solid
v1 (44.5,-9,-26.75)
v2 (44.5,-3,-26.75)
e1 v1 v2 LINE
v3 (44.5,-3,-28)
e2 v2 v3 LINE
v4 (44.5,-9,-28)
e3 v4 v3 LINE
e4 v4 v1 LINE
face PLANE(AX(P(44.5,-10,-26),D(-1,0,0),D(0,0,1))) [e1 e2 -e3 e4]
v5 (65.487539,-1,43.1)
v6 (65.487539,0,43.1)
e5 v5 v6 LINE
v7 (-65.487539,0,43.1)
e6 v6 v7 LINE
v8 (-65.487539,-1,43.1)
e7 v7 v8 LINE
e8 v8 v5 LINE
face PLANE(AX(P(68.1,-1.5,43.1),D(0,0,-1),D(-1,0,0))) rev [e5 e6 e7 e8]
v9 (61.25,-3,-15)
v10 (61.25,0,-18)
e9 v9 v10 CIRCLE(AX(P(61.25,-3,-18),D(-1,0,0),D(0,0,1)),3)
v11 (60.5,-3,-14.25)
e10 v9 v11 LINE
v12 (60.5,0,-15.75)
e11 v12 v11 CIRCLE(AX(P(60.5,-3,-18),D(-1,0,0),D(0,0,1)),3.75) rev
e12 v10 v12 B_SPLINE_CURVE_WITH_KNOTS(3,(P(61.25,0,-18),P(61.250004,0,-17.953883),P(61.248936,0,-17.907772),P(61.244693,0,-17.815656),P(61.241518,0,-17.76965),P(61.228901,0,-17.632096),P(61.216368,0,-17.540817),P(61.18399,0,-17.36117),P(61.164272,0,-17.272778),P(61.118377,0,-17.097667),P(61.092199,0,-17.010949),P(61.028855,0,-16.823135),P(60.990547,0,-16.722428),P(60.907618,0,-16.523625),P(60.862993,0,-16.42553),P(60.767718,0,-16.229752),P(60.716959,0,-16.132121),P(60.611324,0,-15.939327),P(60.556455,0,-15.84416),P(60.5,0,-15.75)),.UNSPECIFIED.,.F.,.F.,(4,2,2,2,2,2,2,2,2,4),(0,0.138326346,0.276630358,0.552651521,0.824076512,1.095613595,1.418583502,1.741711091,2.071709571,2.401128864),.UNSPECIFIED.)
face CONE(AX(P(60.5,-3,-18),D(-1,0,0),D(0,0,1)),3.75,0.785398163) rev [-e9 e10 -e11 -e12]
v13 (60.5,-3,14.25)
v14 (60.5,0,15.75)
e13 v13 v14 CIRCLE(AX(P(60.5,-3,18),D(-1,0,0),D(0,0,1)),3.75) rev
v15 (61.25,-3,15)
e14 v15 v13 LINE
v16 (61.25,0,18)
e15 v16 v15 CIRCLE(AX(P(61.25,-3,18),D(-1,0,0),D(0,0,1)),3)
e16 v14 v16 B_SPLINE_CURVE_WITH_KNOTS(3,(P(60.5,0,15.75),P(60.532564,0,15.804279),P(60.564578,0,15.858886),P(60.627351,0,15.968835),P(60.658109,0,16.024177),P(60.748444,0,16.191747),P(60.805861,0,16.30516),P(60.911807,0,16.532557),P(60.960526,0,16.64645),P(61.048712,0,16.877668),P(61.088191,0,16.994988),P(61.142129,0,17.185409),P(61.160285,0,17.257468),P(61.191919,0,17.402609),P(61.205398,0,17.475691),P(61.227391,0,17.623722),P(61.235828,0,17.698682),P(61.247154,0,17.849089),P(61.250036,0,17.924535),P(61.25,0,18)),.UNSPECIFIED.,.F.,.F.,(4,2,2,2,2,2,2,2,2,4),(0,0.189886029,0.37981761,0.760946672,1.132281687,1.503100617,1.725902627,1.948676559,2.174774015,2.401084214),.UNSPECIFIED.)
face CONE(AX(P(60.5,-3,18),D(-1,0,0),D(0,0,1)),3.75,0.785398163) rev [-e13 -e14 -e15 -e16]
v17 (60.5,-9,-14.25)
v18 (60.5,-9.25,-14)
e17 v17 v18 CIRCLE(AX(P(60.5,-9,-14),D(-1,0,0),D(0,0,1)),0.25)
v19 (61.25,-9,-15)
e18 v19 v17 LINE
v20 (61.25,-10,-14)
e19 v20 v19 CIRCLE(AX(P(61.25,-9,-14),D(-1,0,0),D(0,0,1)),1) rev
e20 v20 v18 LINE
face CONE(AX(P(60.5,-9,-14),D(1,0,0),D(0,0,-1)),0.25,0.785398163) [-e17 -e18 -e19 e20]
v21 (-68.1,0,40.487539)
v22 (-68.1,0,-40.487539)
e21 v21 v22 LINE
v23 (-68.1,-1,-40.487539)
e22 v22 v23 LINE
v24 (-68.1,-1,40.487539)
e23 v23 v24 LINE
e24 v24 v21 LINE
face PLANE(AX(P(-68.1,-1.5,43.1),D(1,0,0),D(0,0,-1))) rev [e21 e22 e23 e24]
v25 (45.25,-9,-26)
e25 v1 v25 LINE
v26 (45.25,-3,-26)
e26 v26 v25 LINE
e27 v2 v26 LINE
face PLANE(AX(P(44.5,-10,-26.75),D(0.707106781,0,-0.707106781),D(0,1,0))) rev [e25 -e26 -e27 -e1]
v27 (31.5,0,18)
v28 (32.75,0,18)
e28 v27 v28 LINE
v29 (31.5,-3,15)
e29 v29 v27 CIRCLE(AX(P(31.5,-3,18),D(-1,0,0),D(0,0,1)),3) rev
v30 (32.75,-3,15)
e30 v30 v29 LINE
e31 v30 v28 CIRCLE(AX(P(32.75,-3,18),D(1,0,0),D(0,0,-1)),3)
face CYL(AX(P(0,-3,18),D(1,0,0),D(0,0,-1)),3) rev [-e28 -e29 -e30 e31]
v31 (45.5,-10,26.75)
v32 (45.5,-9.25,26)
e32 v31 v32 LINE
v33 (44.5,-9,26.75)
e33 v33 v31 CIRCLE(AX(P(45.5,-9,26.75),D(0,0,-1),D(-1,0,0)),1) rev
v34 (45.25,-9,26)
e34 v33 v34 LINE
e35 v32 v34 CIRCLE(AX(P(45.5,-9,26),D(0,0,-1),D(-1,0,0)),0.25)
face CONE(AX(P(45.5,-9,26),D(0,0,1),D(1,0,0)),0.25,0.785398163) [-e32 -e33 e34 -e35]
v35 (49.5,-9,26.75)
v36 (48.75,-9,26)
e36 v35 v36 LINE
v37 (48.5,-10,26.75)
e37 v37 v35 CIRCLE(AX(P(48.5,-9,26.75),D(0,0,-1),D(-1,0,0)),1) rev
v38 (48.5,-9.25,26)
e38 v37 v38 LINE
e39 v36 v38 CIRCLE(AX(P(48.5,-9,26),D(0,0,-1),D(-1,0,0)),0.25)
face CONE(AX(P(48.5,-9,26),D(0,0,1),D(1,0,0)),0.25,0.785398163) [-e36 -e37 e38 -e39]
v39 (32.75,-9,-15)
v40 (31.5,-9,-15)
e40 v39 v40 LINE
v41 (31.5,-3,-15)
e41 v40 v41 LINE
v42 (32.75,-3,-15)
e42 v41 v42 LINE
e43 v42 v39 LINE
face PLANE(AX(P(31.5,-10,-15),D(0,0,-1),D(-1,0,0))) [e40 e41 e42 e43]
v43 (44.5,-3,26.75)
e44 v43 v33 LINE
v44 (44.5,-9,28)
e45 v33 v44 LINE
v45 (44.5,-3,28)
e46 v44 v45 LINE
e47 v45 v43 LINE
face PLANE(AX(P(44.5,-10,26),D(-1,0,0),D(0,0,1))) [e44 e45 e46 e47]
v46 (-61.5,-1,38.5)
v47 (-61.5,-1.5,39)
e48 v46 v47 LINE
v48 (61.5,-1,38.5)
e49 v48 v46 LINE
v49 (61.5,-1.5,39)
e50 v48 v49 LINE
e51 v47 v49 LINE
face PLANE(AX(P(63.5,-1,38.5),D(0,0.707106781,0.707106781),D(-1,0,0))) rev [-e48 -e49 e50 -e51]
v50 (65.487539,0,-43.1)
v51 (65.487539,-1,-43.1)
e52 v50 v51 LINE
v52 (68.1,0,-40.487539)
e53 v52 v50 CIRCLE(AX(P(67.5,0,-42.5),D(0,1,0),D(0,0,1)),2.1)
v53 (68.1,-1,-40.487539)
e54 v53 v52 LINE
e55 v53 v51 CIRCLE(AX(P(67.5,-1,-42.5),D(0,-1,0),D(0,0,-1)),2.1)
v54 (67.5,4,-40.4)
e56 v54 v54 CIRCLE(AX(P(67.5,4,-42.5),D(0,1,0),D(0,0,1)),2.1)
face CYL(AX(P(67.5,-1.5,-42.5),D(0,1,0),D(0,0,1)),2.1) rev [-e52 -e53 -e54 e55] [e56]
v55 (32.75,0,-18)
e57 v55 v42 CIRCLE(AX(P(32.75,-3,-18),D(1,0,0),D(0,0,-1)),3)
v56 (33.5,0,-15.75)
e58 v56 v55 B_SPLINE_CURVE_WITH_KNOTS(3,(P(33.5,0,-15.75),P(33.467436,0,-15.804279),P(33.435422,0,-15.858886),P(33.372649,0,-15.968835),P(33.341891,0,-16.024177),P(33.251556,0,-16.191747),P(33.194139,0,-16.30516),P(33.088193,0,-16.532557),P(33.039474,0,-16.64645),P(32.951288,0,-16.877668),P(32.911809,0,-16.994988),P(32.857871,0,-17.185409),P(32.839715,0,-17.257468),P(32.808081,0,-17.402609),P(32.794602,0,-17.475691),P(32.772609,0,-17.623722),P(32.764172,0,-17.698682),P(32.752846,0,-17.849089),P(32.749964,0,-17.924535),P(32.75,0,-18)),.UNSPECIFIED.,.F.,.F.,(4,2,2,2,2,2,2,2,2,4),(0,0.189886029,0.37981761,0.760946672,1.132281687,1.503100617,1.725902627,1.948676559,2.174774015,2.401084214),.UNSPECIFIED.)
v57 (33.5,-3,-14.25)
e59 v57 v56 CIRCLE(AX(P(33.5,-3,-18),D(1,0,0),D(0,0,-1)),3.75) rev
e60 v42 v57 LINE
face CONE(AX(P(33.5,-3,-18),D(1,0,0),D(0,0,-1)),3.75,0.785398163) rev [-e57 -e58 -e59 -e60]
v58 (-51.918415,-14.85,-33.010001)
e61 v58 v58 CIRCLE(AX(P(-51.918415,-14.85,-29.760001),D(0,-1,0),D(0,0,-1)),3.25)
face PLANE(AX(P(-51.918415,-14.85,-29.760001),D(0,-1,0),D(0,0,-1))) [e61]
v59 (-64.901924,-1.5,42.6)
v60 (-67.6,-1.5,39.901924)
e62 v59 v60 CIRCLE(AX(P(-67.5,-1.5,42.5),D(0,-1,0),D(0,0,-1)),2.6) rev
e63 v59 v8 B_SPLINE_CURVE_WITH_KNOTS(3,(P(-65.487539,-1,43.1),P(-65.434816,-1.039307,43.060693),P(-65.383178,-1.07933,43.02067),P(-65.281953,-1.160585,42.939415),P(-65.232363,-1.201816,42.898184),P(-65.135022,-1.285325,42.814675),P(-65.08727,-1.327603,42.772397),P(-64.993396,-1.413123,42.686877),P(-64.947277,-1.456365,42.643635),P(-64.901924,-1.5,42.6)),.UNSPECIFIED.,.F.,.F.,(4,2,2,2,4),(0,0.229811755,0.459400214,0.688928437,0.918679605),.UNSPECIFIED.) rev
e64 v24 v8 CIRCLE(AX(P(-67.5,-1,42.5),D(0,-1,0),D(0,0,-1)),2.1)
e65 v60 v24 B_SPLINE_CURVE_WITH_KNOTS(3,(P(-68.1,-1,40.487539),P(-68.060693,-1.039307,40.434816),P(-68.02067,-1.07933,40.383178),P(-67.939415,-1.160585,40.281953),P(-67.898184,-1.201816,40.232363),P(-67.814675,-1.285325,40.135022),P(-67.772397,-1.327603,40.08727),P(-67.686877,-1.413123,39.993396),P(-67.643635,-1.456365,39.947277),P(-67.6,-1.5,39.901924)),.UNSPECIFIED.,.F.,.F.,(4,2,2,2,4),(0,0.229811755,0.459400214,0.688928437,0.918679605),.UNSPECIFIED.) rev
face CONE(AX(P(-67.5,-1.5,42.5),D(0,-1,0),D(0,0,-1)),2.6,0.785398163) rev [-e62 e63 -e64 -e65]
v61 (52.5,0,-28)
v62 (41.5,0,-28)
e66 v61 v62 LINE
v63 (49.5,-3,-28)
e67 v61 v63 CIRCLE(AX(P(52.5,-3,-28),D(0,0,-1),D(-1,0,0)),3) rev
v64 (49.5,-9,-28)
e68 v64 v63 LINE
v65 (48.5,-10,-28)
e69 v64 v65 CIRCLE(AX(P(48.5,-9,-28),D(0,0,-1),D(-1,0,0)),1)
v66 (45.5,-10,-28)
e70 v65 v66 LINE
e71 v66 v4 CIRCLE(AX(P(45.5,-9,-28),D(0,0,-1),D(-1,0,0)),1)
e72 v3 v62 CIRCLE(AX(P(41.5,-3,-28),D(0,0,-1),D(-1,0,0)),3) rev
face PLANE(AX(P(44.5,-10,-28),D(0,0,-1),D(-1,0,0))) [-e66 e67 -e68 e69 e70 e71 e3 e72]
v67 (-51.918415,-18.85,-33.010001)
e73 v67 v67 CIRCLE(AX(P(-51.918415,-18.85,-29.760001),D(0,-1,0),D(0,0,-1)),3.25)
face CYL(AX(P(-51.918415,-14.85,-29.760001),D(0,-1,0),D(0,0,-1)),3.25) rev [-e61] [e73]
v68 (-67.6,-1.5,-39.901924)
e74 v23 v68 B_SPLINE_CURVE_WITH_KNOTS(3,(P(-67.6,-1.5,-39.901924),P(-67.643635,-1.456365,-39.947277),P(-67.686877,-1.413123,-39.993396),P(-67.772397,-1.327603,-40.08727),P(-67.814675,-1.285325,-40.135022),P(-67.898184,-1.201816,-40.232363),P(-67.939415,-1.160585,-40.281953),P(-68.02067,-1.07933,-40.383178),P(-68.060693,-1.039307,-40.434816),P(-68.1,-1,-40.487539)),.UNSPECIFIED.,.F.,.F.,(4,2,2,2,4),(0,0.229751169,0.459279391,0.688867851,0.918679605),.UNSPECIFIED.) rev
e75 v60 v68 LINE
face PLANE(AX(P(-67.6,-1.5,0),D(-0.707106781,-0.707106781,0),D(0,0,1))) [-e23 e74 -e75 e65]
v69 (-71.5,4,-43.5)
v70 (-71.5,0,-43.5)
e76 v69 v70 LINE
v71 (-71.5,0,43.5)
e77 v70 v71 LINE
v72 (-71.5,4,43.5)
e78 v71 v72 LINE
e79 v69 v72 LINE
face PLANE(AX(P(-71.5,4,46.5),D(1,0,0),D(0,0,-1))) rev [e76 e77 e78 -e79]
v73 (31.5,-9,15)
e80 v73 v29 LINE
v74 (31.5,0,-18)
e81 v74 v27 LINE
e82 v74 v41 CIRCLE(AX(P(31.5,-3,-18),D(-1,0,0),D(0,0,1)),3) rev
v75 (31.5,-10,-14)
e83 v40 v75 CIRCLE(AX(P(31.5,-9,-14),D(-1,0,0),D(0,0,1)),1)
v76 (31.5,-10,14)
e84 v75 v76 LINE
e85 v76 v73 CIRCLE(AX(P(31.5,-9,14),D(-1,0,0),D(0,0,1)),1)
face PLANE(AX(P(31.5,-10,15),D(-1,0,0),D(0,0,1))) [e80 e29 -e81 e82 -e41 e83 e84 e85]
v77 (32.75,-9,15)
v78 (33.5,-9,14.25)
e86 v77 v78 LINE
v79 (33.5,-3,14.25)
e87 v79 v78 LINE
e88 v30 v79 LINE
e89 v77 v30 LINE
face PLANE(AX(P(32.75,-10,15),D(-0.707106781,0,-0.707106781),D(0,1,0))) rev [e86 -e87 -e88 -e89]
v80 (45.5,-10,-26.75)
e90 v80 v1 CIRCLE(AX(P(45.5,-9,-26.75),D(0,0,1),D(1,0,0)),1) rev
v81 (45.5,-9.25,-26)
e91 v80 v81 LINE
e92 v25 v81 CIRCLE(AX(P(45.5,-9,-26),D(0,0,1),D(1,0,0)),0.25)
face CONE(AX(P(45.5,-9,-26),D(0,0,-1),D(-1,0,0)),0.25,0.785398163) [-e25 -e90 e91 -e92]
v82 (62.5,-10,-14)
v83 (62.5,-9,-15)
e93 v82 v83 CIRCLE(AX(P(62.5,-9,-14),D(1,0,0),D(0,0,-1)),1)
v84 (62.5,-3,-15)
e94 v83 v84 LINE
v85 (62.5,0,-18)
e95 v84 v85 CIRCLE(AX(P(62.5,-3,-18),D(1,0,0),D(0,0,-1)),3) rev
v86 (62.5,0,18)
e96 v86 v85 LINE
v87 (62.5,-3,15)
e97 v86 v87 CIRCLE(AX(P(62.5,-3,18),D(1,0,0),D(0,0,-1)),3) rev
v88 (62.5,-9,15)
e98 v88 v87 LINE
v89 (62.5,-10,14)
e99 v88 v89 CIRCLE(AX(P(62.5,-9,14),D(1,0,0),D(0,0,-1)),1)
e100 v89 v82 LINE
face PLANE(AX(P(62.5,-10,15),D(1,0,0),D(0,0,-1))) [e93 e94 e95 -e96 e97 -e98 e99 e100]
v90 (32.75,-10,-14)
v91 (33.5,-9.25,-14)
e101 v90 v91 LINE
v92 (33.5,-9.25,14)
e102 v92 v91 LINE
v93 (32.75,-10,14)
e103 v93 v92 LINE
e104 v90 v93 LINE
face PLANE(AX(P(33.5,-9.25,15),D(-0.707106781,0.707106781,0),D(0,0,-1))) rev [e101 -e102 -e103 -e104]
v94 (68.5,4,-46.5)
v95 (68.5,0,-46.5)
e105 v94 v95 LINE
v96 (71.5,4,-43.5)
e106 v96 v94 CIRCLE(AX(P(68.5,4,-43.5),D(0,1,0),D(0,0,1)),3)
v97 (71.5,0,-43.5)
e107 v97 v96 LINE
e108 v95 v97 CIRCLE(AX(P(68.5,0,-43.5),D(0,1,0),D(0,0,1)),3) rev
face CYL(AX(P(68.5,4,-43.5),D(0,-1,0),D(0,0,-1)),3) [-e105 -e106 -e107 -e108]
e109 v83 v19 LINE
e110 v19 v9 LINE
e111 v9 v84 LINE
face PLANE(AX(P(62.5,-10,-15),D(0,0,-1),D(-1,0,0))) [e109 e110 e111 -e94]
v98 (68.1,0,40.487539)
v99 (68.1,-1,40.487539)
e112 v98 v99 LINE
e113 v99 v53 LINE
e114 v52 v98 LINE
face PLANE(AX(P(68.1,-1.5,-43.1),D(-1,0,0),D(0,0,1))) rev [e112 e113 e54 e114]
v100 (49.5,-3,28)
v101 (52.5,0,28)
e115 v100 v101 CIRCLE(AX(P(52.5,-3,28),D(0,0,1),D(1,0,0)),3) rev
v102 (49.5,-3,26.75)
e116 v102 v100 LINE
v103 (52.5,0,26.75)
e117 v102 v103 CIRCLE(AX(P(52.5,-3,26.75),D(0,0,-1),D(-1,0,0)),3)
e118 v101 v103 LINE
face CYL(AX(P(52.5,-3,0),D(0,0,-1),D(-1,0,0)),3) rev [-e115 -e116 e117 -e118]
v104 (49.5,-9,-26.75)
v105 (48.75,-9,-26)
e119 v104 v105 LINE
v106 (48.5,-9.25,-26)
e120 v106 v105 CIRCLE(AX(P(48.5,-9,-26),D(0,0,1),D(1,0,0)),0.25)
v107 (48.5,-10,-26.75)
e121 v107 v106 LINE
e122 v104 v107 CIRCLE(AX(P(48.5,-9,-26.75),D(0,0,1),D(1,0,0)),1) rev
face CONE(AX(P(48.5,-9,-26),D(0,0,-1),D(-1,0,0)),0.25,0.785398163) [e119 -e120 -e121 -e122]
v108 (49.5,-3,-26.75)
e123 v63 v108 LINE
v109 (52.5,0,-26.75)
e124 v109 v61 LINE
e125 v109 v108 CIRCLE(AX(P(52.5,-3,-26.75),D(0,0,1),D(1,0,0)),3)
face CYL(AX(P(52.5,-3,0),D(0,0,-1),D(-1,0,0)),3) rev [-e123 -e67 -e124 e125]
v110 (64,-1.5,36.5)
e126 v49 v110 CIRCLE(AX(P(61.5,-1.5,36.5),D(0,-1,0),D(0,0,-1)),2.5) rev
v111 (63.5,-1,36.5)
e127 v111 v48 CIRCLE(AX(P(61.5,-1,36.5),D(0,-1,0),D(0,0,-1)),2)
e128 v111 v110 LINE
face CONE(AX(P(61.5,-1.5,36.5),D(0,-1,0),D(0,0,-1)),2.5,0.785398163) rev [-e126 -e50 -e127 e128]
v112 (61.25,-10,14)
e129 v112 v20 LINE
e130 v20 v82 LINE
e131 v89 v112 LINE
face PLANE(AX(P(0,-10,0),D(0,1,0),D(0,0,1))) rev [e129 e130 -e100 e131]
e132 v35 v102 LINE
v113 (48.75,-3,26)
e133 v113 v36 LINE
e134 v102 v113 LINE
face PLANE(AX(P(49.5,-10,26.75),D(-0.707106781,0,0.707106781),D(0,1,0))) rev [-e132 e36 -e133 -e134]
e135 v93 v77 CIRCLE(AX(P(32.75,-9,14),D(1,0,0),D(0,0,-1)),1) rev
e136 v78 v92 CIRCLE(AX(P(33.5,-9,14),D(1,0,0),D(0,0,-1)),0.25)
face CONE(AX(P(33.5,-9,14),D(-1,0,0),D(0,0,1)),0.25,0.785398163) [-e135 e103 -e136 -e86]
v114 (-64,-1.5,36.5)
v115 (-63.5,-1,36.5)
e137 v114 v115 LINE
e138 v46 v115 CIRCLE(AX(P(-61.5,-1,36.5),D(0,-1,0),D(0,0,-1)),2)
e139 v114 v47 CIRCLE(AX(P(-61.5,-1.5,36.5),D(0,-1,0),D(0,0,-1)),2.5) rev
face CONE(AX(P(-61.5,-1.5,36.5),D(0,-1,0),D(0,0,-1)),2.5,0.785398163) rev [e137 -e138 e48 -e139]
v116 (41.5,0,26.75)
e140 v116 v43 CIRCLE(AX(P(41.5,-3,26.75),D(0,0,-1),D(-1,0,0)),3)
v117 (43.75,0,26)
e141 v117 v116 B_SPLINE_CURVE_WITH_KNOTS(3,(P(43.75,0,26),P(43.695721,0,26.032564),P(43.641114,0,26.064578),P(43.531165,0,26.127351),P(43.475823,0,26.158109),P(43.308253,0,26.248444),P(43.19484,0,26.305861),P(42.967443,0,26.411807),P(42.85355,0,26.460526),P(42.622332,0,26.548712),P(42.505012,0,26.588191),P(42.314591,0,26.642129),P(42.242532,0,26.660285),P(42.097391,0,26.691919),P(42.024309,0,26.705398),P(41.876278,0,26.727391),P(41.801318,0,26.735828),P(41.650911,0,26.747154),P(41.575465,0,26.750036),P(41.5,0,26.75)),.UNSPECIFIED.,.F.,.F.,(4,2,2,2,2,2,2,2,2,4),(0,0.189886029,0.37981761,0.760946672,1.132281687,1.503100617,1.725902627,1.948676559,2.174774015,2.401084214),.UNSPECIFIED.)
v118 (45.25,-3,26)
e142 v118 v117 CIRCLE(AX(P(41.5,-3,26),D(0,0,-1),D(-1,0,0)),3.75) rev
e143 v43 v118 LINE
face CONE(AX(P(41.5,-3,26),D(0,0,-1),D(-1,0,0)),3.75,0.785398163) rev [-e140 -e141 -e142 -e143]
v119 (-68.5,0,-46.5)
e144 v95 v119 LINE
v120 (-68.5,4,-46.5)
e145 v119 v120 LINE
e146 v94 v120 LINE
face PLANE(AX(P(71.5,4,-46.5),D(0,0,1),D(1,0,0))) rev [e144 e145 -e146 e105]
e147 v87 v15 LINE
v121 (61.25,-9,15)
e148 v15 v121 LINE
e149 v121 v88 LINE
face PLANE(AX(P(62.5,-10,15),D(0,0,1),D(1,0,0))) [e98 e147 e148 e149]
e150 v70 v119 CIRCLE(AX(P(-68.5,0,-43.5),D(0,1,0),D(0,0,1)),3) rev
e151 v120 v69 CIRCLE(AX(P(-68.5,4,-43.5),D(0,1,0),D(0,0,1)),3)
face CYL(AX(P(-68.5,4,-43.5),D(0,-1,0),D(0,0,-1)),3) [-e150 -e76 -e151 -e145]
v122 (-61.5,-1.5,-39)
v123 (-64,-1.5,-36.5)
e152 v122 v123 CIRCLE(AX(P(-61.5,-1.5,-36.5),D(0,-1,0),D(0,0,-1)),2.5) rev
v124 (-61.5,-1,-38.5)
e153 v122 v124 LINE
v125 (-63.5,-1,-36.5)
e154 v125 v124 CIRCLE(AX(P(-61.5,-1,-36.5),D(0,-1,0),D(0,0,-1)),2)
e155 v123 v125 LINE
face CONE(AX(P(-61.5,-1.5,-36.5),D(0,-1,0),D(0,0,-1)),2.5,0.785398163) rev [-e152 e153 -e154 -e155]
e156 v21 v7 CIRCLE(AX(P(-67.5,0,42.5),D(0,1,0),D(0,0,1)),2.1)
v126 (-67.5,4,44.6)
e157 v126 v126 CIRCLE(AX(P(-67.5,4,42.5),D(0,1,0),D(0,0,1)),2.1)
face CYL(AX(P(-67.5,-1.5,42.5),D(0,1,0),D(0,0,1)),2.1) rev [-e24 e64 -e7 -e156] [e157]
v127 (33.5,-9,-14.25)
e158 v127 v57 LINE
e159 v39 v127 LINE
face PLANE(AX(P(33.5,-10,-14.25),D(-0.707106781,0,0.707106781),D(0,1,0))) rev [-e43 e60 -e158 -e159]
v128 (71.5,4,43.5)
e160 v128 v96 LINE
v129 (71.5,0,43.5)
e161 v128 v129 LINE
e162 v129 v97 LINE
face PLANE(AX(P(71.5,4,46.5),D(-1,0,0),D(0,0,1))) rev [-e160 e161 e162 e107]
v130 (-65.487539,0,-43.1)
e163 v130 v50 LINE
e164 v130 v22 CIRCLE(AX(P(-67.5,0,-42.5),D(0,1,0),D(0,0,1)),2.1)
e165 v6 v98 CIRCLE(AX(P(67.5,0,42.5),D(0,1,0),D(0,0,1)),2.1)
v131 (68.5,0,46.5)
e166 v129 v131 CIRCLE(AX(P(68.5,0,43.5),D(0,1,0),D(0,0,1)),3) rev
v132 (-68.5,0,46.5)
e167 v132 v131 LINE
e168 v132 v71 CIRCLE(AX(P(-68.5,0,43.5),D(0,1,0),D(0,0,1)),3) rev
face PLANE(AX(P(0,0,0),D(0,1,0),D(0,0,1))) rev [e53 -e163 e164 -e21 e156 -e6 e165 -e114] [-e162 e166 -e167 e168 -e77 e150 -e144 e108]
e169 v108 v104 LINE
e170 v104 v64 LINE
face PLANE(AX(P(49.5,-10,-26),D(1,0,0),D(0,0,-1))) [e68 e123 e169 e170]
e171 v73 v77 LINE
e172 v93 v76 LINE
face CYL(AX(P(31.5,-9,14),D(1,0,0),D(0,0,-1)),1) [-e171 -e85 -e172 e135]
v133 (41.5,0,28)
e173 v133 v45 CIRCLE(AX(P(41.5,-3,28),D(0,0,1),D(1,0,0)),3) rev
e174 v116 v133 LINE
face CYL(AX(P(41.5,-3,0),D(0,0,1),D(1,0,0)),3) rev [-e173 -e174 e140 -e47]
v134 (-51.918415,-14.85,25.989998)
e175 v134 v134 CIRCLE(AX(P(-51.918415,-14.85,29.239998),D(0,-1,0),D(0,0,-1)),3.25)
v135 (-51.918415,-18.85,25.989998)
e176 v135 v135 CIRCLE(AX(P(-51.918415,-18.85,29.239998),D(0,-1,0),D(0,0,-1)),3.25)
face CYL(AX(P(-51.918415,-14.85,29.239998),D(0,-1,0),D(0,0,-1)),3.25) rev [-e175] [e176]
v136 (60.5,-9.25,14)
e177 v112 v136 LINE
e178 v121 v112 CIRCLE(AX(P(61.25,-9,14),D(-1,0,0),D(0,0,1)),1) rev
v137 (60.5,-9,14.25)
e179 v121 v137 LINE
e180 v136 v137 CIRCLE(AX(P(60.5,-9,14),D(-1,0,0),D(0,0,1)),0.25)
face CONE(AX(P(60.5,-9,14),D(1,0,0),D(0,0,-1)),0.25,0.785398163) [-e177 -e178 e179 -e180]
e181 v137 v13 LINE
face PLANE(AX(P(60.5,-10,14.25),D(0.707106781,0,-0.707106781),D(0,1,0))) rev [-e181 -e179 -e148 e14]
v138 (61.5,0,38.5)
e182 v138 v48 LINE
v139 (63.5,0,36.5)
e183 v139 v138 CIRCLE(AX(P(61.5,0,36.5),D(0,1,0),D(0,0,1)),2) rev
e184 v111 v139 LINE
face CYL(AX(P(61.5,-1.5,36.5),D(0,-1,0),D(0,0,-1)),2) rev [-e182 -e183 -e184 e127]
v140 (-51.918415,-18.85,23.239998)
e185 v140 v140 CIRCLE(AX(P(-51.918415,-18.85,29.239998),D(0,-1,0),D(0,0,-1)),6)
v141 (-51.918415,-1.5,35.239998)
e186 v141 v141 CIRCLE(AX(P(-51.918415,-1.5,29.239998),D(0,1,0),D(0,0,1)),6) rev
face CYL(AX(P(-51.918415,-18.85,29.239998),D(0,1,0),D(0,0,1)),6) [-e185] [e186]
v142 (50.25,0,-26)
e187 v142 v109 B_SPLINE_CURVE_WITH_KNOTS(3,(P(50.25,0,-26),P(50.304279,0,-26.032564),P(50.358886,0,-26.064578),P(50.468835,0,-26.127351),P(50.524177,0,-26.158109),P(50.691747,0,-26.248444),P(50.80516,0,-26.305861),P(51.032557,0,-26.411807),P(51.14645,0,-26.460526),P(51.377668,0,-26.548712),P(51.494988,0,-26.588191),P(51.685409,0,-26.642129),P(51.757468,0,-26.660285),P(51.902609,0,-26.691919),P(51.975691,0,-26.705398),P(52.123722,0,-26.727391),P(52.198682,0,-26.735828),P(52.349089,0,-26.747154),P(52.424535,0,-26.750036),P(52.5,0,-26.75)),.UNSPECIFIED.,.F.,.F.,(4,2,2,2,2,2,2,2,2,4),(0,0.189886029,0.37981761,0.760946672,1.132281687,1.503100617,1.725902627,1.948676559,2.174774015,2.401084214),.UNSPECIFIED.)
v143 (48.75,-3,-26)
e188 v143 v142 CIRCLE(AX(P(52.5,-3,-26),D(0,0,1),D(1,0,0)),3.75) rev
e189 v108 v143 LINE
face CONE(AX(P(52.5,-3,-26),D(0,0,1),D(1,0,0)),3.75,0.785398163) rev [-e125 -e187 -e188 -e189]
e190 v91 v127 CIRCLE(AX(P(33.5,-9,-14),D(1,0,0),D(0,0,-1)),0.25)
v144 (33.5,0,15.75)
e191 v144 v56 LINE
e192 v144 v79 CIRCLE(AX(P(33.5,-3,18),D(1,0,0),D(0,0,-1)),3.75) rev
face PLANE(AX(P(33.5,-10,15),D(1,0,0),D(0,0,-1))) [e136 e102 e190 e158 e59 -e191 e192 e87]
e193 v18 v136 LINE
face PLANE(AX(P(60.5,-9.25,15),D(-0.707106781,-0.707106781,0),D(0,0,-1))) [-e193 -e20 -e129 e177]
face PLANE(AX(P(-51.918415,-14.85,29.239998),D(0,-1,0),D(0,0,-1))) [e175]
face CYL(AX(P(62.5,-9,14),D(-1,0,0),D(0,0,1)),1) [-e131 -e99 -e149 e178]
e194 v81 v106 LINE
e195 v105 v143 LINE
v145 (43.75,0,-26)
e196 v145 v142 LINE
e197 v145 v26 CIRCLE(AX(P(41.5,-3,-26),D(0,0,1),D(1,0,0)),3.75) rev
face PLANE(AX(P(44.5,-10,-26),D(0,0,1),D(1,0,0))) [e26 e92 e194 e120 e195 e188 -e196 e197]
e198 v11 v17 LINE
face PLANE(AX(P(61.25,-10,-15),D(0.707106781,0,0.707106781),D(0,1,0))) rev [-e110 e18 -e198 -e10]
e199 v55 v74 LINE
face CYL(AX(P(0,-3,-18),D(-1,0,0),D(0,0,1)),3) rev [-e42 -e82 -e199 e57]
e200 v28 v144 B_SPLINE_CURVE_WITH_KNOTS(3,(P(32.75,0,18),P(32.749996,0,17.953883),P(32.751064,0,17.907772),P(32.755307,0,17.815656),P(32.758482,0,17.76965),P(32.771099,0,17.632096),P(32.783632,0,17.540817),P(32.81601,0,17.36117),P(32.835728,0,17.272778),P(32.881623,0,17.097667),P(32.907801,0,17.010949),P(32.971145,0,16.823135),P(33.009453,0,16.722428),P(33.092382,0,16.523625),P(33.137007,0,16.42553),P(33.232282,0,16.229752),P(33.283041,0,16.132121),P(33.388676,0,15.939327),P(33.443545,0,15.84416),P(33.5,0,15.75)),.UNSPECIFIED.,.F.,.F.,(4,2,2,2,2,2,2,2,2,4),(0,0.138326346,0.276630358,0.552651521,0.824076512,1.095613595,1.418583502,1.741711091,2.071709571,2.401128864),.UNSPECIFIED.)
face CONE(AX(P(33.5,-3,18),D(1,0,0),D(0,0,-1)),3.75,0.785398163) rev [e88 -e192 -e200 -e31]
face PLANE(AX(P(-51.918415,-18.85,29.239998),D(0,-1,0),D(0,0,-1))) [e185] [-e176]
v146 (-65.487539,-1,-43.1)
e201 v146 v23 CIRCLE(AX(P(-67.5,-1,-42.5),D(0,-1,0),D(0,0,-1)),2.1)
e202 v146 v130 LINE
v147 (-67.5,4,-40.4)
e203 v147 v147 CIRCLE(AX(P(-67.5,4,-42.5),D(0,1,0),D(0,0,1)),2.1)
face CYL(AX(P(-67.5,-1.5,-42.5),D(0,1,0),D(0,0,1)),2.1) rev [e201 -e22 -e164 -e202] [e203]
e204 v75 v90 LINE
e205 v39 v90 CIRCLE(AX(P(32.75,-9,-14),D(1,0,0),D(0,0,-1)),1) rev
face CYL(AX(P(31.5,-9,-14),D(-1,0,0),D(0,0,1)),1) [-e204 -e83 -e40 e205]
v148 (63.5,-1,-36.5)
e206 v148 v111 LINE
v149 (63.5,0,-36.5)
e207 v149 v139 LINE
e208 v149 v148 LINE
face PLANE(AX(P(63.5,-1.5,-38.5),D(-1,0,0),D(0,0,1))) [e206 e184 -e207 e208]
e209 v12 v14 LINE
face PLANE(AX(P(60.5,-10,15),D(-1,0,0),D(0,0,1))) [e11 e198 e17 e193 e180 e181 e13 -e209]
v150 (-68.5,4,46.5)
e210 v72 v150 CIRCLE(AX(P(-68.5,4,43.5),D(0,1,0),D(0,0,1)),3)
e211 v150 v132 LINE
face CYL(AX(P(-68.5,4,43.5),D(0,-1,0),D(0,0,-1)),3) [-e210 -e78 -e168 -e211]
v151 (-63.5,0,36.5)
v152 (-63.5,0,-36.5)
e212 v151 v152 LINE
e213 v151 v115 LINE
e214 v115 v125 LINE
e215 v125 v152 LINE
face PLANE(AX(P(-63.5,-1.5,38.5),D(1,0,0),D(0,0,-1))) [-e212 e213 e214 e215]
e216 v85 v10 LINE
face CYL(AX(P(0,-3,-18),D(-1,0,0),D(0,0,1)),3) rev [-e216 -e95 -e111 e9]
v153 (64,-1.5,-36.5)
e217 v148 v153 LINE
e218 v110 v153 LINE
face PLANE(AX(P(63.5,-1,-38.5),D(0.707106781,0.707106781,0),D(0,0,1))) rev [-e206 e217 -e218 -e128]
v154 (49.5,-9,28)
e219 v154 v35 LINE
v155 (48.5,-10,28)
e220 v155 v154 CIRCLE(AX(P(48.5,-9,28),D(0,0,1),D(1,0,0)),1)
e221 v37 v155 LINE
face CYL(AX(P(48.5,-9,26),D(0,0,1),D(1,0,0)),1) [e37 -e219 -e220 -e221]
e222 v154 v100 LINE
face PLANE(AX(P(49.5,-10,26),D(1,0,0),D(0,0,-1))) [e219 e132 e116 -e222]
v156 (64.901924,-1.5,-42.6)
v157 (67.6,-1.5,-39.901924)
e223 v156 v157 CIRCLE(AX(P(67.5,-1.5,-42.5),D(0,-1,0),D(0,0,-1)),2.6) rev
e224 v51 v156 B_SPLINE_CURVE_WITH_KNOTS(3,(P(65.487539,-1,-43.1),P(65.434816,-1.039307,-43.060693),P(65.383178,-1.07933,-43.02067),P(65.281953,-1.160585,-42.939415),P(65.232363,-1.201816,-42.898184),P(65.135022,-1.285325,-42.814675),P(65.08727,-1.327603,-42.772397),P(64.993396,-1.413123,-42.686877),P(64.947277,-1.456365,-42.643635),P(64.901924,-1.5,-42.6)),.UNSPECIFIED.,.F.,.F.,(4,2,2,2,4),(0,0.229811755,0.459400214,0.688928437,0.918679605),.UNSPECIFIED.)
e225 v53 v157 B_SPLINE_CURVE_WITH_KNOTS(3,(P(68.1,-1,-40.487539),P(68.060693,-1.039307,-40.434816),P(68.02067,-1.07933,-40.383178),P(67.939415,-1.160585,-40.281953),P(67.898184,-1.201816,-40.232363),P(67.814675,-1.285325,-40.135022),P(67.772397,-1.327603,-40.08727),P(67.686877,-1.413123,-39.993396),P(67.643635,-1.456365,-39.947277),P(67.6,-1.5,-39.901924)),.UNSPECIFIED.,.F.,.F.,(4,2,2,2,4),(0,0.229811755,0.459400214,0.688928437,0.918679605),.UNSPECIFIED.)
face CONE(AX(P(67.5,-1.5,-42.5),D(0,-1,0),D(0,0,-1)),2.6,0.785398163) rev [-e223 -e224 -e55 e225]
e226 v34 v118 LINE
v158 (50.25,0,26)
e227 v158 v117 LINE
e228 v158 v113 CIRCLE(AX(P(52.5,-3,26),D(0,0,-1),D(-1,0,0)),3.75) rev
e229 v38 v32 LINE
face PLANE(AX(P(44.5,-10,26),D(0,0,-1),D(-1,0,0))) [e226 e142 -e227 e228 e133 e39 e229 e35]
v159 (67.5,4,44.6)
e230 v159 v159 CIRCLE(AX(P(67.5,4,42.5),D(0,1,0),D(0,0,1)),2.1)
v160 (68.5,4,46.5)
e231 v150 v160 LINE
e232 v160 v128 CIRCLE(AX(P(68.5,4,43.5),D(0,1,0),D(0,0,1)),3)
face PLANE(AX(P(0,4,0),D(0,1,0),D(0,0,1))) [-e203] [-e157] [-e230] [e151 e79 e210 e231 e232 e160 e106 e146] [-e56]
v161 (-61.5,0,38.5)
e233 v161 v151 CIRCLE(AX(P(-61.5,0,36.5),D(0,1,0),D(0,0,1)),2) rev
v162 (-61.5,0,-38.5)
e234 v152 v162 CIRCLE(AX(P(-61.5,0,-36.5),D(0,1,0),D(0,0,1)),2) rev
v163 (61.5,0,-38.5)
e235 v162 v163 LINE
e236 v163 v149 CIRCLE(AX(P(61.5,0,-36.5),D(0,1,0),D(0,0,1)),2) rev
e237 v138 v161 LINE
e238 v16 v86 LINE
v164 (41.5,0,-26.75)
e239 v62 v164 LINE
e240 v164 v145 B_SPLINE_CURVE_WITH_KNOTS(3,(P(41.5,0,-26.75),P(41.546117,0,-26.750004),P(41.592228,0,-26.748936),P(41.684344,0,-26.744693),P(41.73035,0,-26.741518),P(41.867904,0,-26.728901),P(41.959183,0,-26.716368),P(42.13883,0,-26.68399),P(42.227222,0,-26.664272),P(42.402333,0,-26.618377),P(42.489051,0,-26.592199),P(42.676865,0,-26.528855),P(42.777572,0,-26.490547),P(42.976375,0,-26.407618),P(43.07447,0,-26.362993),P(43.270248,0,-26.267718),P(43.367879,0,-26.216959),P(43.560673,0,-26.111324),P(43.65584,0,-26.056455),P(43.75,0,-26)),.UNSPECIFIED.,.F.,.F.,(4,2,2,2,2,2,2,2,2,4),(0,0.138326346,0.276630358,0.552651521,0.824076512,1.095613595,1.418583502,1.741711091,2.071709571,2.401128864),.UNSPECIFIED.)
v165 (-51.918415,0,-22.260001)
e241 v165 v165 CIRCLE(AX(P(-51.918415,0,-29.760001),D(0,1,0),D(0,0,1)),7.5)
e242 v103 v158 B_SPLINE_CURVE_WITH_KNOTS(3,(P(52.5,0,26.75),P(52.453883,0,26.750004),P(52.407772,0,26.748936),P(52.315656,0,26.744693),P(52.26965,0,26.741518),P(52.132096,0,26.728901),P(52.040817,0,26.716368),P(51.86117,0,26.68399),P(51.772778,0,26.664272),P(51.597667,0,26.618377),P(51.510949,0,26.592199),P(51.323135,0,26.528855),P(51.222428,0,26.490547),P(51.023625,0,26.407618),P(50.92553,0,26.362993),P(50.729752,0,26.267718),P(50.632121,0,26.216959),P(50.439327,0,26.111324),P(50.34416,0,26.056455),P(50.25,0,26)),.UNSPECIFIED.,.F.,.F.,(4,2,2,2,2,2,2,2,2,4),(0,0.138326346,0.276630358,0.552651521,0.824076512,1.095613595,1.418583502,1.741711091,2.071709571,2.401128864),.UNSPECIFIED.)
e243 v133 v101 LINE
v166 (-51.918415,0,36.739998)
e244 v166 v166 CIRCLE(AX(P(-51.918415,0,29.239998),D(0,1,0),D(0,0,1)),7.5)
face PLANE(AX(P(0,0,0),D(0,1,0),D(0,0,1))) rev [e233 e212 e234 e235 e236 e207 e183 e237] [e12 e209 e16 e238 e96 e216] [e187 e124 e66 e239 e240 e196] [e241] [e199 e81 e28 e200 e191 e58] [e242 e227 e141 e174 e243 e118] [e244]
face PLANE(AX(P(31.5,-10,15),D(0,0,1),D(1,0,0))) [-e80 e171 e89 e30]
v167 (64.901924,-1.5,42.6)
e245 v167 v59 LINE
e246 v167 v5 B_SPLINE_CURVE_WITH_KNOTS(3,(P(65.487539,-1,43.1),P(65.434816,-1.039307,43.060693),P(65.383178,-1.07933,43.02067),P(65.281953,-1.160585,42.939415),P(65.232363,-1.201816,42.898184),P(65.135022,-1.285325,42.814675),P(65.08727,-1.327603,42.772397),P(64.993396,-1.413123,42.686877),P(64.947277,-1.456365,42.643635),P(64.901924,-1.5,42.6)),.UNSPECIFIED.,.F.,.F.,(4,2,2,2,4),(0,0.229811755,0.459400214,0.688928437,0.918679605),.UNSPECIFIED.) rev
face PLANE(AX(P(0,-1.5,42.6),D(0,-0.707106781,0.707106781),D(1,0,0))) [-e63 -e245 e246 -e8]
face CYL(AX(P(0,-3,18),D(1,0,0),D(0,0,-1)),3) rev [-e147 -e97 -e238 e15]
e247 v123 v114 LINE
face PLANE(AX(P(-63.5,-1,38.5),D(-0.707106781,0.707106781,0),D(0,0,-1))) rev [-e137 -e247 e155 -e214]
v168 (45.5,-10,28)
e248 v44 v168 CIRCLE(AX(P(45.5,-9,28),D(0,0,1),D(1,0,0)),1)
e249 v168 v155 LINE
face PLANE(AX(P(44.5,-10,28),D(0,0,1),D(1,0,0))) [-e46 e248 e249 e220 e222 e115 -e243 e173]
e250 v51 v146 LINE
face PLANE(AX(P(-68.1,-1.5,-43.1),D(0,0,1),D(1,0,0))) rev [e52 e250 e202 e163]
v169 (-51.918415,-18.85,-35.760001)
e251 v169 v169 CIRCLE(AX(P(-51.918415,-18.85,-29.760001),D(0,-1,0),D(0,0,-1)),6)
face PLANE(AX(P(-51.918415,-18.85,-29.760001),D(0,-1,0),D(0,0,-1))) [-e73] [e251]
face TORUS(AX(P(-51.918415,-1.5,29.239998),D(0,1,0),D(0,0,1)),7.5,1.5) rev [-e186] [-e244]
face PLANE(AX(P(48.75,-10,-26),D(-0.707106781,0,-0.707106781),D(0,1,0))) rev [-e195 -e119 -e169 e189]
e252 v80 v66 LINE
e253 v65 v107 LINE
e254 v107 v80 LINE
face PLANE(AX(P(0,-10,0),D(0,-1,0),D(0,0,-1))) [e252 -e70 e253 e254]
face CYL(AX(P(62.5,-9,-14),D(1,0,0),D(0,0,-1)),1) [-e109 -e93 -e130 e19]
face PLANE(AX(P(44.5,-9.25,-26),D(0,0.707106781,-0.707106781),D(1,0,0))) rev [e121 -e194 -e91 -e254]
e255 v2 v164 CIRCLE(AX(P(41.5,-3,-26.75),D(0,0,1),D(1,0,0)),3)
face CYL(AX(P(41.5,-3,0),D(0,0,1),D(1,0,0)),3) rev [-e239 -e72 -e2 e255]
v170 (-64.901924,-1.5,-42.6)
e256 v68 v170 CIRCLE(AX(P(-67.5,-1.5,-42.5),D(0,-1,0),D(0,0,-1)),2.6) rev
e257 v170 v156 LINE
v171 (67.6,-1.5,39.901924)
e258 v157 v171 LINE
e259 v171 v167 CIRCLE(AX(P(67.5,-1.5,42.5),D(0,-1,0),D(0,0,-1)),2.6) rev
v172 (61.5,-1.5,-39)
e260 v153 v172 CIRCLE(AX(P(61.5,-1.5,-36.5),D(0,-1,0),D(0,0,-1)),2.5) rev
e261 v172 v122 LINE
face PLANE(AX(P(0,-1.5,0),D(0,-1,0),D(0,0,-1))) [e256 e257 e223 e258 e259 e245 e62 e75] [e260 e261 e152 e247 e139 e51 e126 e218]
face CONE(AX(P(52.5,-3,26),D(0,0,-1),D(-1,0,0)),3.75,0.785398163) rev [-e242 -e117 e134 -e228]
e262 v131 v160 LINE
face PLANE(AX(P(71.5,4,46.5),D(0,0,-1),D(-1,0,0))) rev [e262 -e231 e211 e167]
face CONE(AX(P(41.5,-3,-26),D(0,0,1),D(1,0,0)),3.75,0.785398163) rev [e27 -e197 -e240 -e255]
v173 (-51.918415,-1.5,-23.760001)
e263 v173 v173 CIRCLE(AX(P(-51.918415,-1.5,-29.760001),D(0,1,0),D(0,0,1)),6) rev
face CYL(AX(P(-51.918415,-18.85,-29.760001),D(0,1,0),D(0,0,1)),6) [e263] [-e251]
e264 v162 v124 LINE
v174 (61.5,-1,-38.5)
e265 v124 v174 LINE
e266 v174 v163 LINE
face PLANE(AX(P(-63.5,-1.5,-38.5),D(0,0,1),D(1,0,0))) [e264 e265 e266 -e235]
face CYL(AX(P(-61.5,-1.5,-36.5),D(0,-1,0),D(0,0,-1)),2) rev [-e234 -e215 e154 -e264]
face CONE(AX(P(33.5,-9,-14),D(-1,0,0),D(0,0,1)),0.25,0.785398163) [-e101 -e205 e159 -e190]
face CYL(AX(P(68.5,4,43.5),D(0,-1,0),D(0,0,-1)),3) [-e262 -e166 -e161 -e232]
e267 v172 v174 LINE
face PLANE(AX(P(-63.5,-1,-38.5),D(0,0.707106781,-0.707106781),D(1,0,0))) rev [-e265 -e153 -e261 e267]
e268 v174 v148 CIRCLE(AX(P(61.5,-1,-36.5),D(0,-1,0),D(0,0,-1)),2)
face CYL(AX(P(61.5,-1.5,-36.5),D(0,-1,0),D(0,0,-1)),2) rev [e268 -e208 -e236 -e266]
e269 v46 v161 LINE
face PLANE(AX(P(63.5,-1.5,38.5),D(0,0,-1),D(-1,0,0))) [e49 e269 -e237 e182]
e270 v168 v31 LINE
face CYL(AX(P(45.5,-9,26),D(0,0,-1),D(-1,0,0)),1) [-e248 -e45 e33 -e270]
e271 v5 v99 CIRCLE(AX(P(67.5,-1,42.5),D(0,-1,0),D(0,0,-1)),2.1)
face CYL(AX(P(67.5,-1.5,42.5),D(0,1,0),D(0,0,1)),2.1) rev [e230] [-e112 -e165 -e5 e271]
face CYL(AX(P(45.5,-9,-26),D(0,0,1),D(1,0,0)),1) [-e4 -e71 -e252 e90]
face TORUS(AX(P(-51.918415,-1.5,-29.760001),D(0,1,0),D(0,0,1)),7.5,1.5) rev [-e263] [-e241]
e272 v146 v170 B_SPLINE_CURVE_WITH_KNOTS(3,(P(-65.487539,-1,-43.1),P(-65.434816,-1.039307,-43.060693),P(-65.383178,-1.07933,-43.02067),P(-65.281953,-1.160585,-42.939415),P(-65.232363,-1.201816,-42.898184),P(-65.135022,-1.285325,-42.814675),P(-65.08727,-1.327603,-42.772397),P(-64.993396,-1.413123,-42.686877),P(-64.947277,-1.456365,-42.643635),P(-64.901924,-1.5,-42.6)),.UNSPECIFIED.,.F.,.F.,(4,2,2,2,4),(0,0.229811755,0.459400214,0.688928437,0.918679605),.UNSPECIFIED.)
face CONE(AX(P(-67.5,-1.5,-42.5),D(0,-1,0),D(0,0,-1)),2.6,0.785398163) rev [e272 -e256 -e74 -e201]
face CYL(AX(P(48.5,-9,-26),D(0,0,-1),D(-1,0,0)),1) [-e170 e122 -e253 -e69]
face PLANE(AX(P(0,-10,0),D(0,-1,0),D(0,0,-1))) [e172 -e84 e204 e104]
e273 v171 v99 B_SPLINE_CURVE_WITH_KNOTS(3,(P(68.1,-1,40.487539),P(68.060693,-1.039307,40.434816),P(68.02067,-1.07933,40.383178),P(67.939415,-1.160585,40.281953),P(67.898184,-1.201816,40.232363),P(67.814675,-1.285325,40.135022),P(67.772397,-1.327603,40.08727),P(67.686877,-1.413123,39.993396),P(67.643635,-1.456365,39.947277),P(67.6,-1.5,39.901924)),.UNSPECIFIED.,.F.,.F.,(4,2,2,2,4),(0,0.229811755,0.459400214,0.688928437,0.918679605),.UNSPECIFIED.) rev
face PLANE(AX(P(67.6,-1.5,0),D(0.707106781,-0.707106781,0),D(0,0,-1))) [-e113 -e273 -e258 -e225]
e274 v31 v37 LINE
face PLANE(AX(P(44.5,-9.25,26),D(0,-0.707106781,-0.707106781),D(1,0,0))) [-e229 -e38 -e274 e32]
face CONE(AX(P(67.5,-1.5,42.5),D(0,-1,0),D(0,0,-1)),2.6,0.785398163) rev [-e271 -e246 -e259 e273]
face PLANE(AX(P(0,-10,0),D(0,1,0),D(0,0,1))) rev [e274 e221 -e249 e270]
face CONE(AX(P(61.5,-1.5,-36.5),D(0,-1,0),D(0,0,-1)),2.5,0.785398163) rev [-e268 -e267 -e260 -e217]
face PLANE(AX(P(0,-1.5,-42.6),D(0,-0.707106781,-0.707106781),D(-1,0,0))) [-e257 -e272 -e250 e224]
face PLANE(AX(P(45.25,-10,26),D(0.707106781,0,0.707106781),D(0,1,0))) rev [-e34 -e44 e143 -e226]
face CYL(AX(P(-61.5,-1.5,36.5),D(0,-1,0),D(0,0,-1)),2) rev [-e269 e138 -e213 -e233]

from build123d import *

# Parameters (mm, degrees)
SKETCH1_W               = 143
SKETCH1_H               = 93
LID_BASE_DEPTH          = 4
FILLET1_R               = 3
SKETCH3_W               = 136.2
SKETCH3_H               = 86.2
SKETCH3_W_2             = 127
SKETCH3_H_2             = 77
LIP_DEPTH               = 1.5
SKETCH2_R               = 2.1
SCREWS_DEPTH            = 86.467830205
LIP_FILLET_R            = 2
LIP_CHAMFER_SIZE        = 0.5
SKETCH4_W               = 5
SKETCH4_H               = 2
SKETCH4_W_2             = 2
SKETCH4_H_2             = 30
BATTERY_POCKET_DEPTH    = 14
BOTTOM_POCKET_FILLET_R  = 3
POCKET_CORNER_FILLETS_R = 1
POCKET_CHAMFER_SIZE     = 0.75
SKETCH5_R               = 6
STOMP_SUPPORT_DEPTH     = 18.85
SKETCH6_R               = 3.25
SCREW_HEAD_PLACE_DEPTH  = 4
FILLET4_R               = 1.5


with BuildPart() as part:
    # Sketch1 → lid base (new body)
    with BuildSketch(Plane(origin=(0, 0, 0), x_dir=(1, 0, 0), z_dir=(0, 1, 0))):
        Rectangle(SKETCH1_W, SKETCH1_H)
    extrude(amount=LID_BASE_DEPTH)

    # Fillet1
    fillet1_edges = [part.edges().sort_by_distance(p)[0] for p in [
        (-71.5, 2, -46.5),
        (71.5, 2, -46.5),
        (71.5, 2, 46.5),
        (-71.5, 2, 46.5),
    ]]
    fillet(fillet1_edges, radius=FILLET1_R)

    # Sketch3 → lip (add)
    with BuildSketch(Plane.XZ):
        Rectangle(SKETCH3_W, SKETCH3_H)
        Rectangle(SKETCH3_W_2, SKETCH3_H_2, mode=Mode.SUBTRACT)
    extrude(amount=LIP_DEPTH)

    # Sketch2 → screws (cut, through all)
    with BuildSketch(Plane(origin=(0, 4, 0), x_dir=(1, 0, 0), z_dir=(0, 1, 0))):
        with Locations(Location((-67.5, -42.5, 0), (0, 0, 270))):
            Circle(SKETCH2_R)
        with Locations(Location((67.5, -42.5, 0), (0, 0, 270))):
            Circle(SKETCH2_R)
        with Locations(Location((67.5, 42.5, 0), (0, 0, 270))):
            Circle(SKETCH2_R)
        with Locations(Location((-67.5, 42.5, 0), (0, 0, 270))):
            Circle(SKETCH2_R)
    extrude(amount=-SCREWS_DEPTH, mode=Mode.SUBTRACT)

    # lip fillet
    lip_fillet_edges = [part.edges().sort_by_distance(p)[0] for p in [
        (63.5, -0.75, 38.5),
        (-63.5, -0.75, 38.5),
        (-63.5, -0.75, -38.5),
        (63.5, -0.75, -38.5),
    ]]
    fillet(lip_fillet_edges, radius=LIP_FILLET_R)

    # lip chamfer
    lip_chamfer_edges = [part.edges().sort_by_distance(p)[0] for p in [
        (0, -1.5, 38.5),
        (-63.5, -1.5, 0),
        (0, -1.5, -38.5),
        (63.5, -1.5, 0),
        (-62.914213562, -1.5, 37.914213562),
        (-62.914213562, -1.5, -37.914213562),
        (62.914213562, -1.5, -37.914213562),
        (62.914213562, -1.5, 37.914213562),
        (0, -1.5, -43.1),
        (-68.1, -1.5, 0),
        (0, -1.5, 43.1),
        (68.1, -1.5, 0),
        (-65.816254176, -1.5, -41.24500996),
        (65.816254176, -1.5, -41.24500996),
        (66.01507576, -1.5, 41.01507576),
        (-66.01507576, -1.5, 41.01507576),
    ]]
    chamfer(lip_chamfer_edges, length=LIP_CHAMFER_SIZE)

    # Sketch4 → battery pocket (add)
    with BuildSketch(Plane(origin=(0, 4, 0), x_dir=(1, 0, 0), z_dir=(0, 1, 0))):
        with Locations((47, -27)):
            Rectangle(SKETCH4_W, SKETCH4_H)
        with Locations((61.5, 0)):
            Rectangle(SKETCH4_W_2, SKETCH4_H_2)
        with Locations((32.5, 0)):
            Rectangle(SKETCH4_W_2, SKETCH4_H_2)
        with Locations((47, 27)):
            Rectangle(SKETCH4_W, SKETCH4_H)
    extrude(amount=-BATTERY_POCKET_DEPTH)

    # bottom pocket fillet
    bottom_pocket_fillet_edges = [part.edges().sort_by_distance(p)[0] for p in [
        (44.5, 0, 27),
        (49.5, 0, 27),
        (61.5, 0, 15),
        (61.5, 0, -15),
        (32.5, 0, 15),
        (32.5, 0, -15),
        (49.5, 0, -27),
        (44.5, 0, -27),
    ]]
    fillet(bottom_pocket_fillet_edges, radius=BOTTOM_POCKET_FILLET_R)

    # pocket corner fillets
    pocket_corner_fillets_edges = [part.edges().sort_by_distance(p)[0] for p in [
        (49.5, -10, 27),
        (44.5, -10, 27),
        (61.5, -10, -15),
        (61.5, -10, 15),
        (32.5, -10, -15),
        (32.5, -10, 15),
        (44.5, -10, -27),
        (49.5, -10, -27),
    ]]
    fillet(pocket_corner_fillets_edges, radius=POCKET_CORNER_FILLETS_R)

    # pocket chamfer
    # the kernel refuses this chamfer: 0.75 mm, written as the material it takes off along each edge
    with BuildSketch(Plane(origin=(41.5, -3, 26), x_dir=(-0.5997422926450471, 0.8001932156753535, 0), z_dir=(-0.8001932156753535, -0.5997422926450471, 0))) as pocket_chamfer_piece_1_section:
        Polygon((3, -POCKET_CHAMFER_SIZE), (3 + POCKET_CHAMFER_SIZE, 0), (3, 0), align=None)
    pocket_chamfer_piece_1 = revolve(axis=Axis((41.5, -3, 26), (0, 0, -1)), revolution_arc=126.851442945, mode=Mode.PRIVATE)
    pocket_chamfer_piece_1 = split(pocket_chamfer_piece_1, bisect_by=Plane(origin=(43.677166172, 0, 26.274961133), z_dir=(0, -1, 0)), keep=Keep.TOP, mode=Mode.PRIVATE)
    add(pocket_chamfer_piece_1, mode=Mode.SUBTRACT)
    with BuildSketch(Plane(origin=(52.5, -3, 26), x_dir=(0.5997422926450471, 0.8001932156753535, 0), z_dir=(0.8001932156753535, -0.5997422926450471, 0))) as pocket_chamfer_piece_2_section:
        Polygon((3, POCKET_CHAMFER_SIZE), (3 + POCKET_CHAMFER_SIZE, 0), (3, 0), align=None)
    pocket_chamfer_piece_2 = revolve(axis=Axis((52.5, -3, 26), (0, 0, 1)), revolution_arc=126.851442945, mode=Mode.PRIVATE)
    pocket_chamfer_piece_2 = split(pocket_chamfer_piece_2, bisect_by=Plane(origin=(50.322833828, 0, 26.274961133), z_dir=(0, -1, 0)), keep=Keep.TOP, mode=Mode.PRIVATE)
    add(pocket_chamfer_piece_2, mode=Mode.SUBTRACT)
    with BuildSketch(Plane(origin=(60.5, -3, 18), x_dir=(0, 0.8001932156753528, 0.599742292645048), z_dir=(0, -0.599742292645048, 0.8001932156753528))) as pocket_chamfer_piece_3_section:
        Polygon((3, -POCKET_CHAMFER_SIZE), (3 + POCKET_CHAMFER_SIZE, 0), (3, 0), align=None)
    pocket_chamfer_piece_3 = revolve(axis=Axis((60.5, -3, 18), (-1, 0, 0)), revolution_arc=126.851442945, mode=Mode.PRIVATE)
    pocket_chamfer_piece_3 = split(pocket_chamfer_piece_3, bisect_by=Plane(origin=(60.774961135, 0, 15.822833887), z_dir=(0, -1, 0)), keep=Keep.TOP, mode=Mode.PRIVATE)
    add(pocket_chamfer_piece_3, mode=Mode.SUBTRACT)
    with BuildSketch(Plane(origin=(60.5, -3, -18), x_dir=(0, 0.8001932156753528, -0.599742292645048), z_dir=(0, -0.599742292645048, -0.8001932156753528))) as pocket_chamfer_piece_4_section:
        Polygon((3, POCKET_CHAMFER_SIZE), (3 + POCKET_CHAMFER_SIZE, 0), (3, 0), align=None)
    pocket_chamfer_piece_4 = revolve(axis=Axis((60.5, -3, -18), (1, 0, 0)), revolution_arc=126.851442945, mode=Mode.PRIVATE)
    pocket_chamfer_piece_4 = split(pocket_chamfer_piece_4, bisect_by=Plane(origin=(60.774961133, 0, -15.822833828), z_dir=(0, -1, 0)), keep=Keep.TOP, mode=Mode.PRIVATE)
    add(pocket_chamfer_piece_4, mode=Mode.SUBTRACT)
    with BuildSketch(Plane(origin=(52.5, -3, -26), x_dir=(0.5997422926450471, 0.8001932156753535, 2.3684757858670017e-15), z_dir=(0.8001932156753535, -0.5997422926450471, 2.8428573830131827e-15))) as pocket_chamfer_piece_5_section:
        Polygon((3, -POCKET_CHAMFER_SIZE), (3 + POCKET_CHAMFER_SIZE, 0), (3, 0), align=None)
    pocket_chamfer_piece_5 = revolve(axis=Axis((52.5, -3, -26), (0, 0, 1)), revolution_arc=126.851442945, mode=Mode.PRIVATE)
    pocket_chamfer_piece_5 = split(pocket_chamfer_piece_5, bisect_by=Plane(origin=(50.322833828, 0, -26.274961133), z_dir=(0, -1, 0)), keep=Keep.TOP, mode=Mode.PRIVATE)
    add(pocket_chamfer_piece_5, mode=Mode.SUBTRACT)
    with BuildSketch(Plane(origin=(41.5, -3, -26), x_dir=(-0.5997422926450493, 0.8001932156753517, -2.368475785867001e-15), z_dir=(-0.8001932156753517, -0.5997422926450493, -2.8428573830131665e-15))) as pocket_chamfer_piece_6_section:
        Polygon((3 + POCKET_CHAMFER_SIZE, 0), (3, POCKET_CHAMFER_SIZE), (3, 0), align=None)
    pocket_chamfer_piece_6 = revolve(axis=Axis((41.5, -3, -26), (0, 0, -1)), revolution_arc=126.851442945, mode=Mode.PRIVATE)
    pocket_chamfer_piece_6 = split(pocket_chamfer_piece_6, bisect_by=Plane(origin=(43.677165597, 0, -26.274960992), z_dir=(0, -1, 0)), keep=Keep.TOP, mode=Mode.PRIVATE)
    add(pocket_chamfer_piece_6, mode=Mode.SUBTRACT)
    with BuildSketch(Plane(origin=(33.5, -3, -18), x_dir=(0, 0.8001932156753535, -0.5997422926450471), z_dir=(0, -0.5997422926450471, -0.8001932156753535))) as pocket_chamfer_piece_7_section:
        Polygon((3 + POCKET_CHAMFER_SIZE, 0), (3, -POCKET_CHAMFER_SIZE), (3, 0), align=None)
    pocket_chamfer_piece_7 = revolve(axis=Axis((33.5, -3, -18), (1, 0, 0)), revolution_arc=126.851442945, mode=Mode.PRIVATE)
    pocket_chamfer_piece_7 = split(pocket_chamfer_piece_7, bisect_by=Plane(origin=(33.225038867, 0, -15.822833828), z_dir=(0, -1, 0)), keep=Keep.TOP, mode=Mode.PRIVATE)
    add(pocket_chamfer_piece_7, mode=Mode.SUBTRACT)
    with BuildSketch(Plane(origin=(33.5, -3, 18), x_dir=(0, 0.8001932156753535, 0.5997422926450471), z_dir=(0, -0.5997422926450471, 0.8001932156753535))) as pocket_chamfer_piece_8_section:
        Polygon((3 + POCKET_CHAMFER_SIZE, 0), (3, POCKET_CHAMFER_SIZE), (3, 0), align=None)
    pocket_chamfer_piece_8 = revolve(axis=Axis((33.5, -3, 18), (-1, 0, 0)), revolution_arc=126.851442945, mode=Mode.PRIVATE)
    pocket_chamfer_piece_8 = split(pocket_chamfer_piece_8, bisect_by=Plane(origin=(33.225038867, 0, 15.822833828), z_dir=(0, -1, 0)), keep=Keep.TOP, mode=Mode.PRIVATE)
    add(pocket_chamfer_piece_8, mode=Mode.SUBTRACT)
    with BuildSketch(Plane(origin=(60.5, -3, -15), x_dir=(-0.027495876610582164, 0, 0.9996219169112969), z_dir=(0, -1, 0)), Plane(origin=(49.5, -3, 26), x_dir=(-0.9996219169112968, 0, -0.027495876610586893), z_dir=(0, -1, 0)), Plane(origin=(33.5, -3, 15), x_dir=(0.027495876610582164, 0, -0.9996219169112969), z_dir=(0, -1, 0)), Plane(origin=(44.5, -3, -26), x_dir=(0.9996219169112968, 0, 0.027495876610586893), z_dir=(0, -1, 0)), Plane(origin=(49.5, -3, -26), x_dir=(0.027495876610582164, 0, -0.9996219169112969), z_dir=(0, -1, 0))) as pocket_chamfer_piece_9:
        Polygon((POCKET_CHAMFER_SIZE * 0.999621916911, -POCKET_CHAMFER_SIZE * 0.0274958766106), (-POCKET_CHAMFER_SIZE * 0.0274958766106, -POCKET_CHAMFER_SIZE * 0.999621916911), (0, 0), align=None)
    extrude(amount=6, mode=Mode.SUBTRACT)
    with BuildSketch(Plane(origin=(60.5, -10, 14), x_dir=(-0.027495876610582164, 0.9996219169112969, 0), z_dir=(0, 0, -1))) as pocket_chamfer_piece_10:
        Polygon((POCKET_CHAMFER_SIZE * 0.999621916911, POCKET_CHAMFER_SIZE * 0.0274958766106), (-POCKET_CHAMFER_SIZE * 0.0274958766106, POCKET_CHAMFER_SIZE * 0.999621916911), (0, 0), align=None)
    extrude(amount=28, mode=Mode.SUBTRACT)
    with BuildSketch(Plane(origin=(60.5, -3, 15), x_dir=(-0.027495876610582164, 0, -0.9996219169112969), z_dir=(0, -1, 0)), Plane(origin=(44.5, -3, 26), x_dir=(0.9996219169112968, 0, -0.027495876610586893), z_dir=(0, -1, 0)), Plane(origin=(33.5, -3, -15), x_dir=(0.027495876610582164, 0, 0.9996219169112969), z_dir=(0, -1, 0))) as pocket_chamfer_piece_11:
        Polygon((POCKET_CHAMFER_SIZE * 0.999621916911, POCKET_CHAMFER_SIZE * 0.0274958766106), (-POCKET_CHAMFER_SIZE * 0.0274958766106, POCKET_CHAMFER_SIZE * 0.999621916911), (0, 0), align=None)
    extrude(amount=6, mode=Mode.SUBTRACT)
    with BuildSketch(Plane(origin=(60.5, -9, 14), x_dir=(0, -1, 0), z_dir=(0, 0, -1))) as pocket_chamfer_piece_12:
        Polygon((1 - POCKET_CHAMFER_SIZE, 0), (1, -POCKET_CHAMFER_SIZE), (1, 0), align=None)
    revolve(axis=Axis((60.5, -9, 14), (-1, 0, 0)), revolution_arc=90, mode=Mode.SUBTRACT)
    with BuildSketch(Plane(origin=(60.5, -9, -14), x_dir=(0, -1, 0), z_dir=(0, 0, 1))) as pocket_chamfer_piece_13:
        Polygon((1 - POCKET_CHAMFER_SIZE, 0), (1, POCKET_CHAMFER_SIZE), (1, 0), align=None)
    revolve(axis=Axis((60.5, -9, -14), (1, 0, 0)), revolution_arc=90, mode=Mode.SUBTRACT)
    with BuildSketch(Plane(origin=(45.5, -10, 26), x_dir=(0, 0.9996219169112965, -0.02749587661058676), z_dir=(1, 0, 0))) as pocket_chamfer_piece_14:
        Polygon((POCKET_CHAMFER_SIZE * 0.999621916911, POCKET_CHAMFER_SIZE * 0.0274958766106), (-POCKET_CHAMFER_SIZE * 0.0274958766106, POCKET_CHAMFER_SIZE * 0.999621916911), (0, 0), align=None)
    extrude(amount=3, mode=Mode.SUBTRACT)
    with BuildSketch(Plane(origin=(45.5, -9, 26), x_dir=(0, -1, 0), z_dir=(1, 0, 0))) as pocket_chamfer_piece_15:
        Polygon((1 - POCKET_CHAMFER_SIZE, 0), (1, -POCKET_CHAMFER_SIZE), (1, 0), align=None)
    revolve(axis=Axis((45.5, -9, 26), (0, 0, -1)), revolution_arc=90, mode=Mode.SUBTRACT)
    with BuildSketch(Plane(origin=(48.5, -9, 26), x_dir=(0, -1, 0), z_dir=(-1, 0, 0))) as pocket_chamfer_piece_16:
        Polygon((1 - POCKET_CHAMFER_SIZE, 0), (1, POCKET_CHAMFER_SIZE), (1, 0), align=None)
    revolve(axis=Axis((48.5, -9, 26), (0, 0, 1)), revolution_arc=90, mode=Mode.SUBTRACT)
    with BuildSketch(Plane(origin=(33.5, -10, 14), x_dir=(0.027495876610582164, 0.9996219169112969, 0), z_dir=(0, 0, -1))) as pocket_chamfer_piece_17:
        Polygon((POCKET_CHAMFER_SIZE * 0.999621916911, -POCKET_CHAMFER_SIZE * 0.0274958766106), (-POCKET_CHAMFER_SIZE * 0.0274958766106, -POCKET_CHAMFER_SIZE * 0.999621916911), (0, 0), align=None)
    extrude(amount=28, mode=Mode.SUBTRACT)
    with BuildSketch(Plane(origin=(33.5, -9, -14), x_dir=(0, -1, 0), z_dir=(0, 0, 1))) as pocket_chamfer_piece_18:
        Polygon((1 - POCKET_CHAMFER_SIZE, 0), (1, -POCKET_CHAMFER_SIZE), (1, 0), align=None)
    revolve(axis=Axis((33.5, -9, -14), (1, 0, 0)), revolution_arc=90, mode=Mode.SUBTRACT)
    with BuildSketch(Plane(origin=(33.5, -9, 14), x_dir=(0, 0, 1), z_dir=(0, 1, 0))) as pocket_chamfer_piece_19:
        Polygon((1 - POCKET_CHAMFER_SIZE, 0), (1, -POCKET_CHAMFER_SIZE), (1, 0), align=None)
    revolve(axis=Axis((33.5, -9, 14), (1, 0, 0)), revolution_arc=90, mode=Mode.SUBTRACT)
    with BuildSketch(Plane(origin=(45.5, -10, -26), x_dir=(0, 0.9996219169112965, 0.02749587661058676), z_dir=(1, 0, 0))) as pocket_chamfer_piece_20:
        Polygon((POCKET_CHAMFER_SIZE * 0.999621916911, -POCKET_CHAMFER_SIZE * 0.0274958766106), (-POCKET_CHAMFER_SIZE * 0.0274958766106, -POCKET_CHAMFER_SIZE * 0.999621916911), (0, 0), align=None)
    extrude(amount=3, mode=Mode.SUBTRACT)
    with BuildSketch(Plane(origin=(48.5, -9, -26), x_dir=(1, 0, 0), z_dir=(0, 1, 0))) as pocket_chamfer_piece_21:
        Polygon((1, POCKET_CHAMFER_SIZE), (1 - POCKET_CHAMFER_SIZE, 0), (1, 0), align=None)
    revolve(axis=Axis((48.5, -9, -26), (0, 0, -1)), revolution_arc=90, mode=Mode.SUBTRACT)
    with BuildSketch(Plane(origin=(45.5, -9, -26), x_dir=(0, -1, 0), z_dir=(1, 0, 0))) as pocket_chamfer_piece_22:
        Polygon((1 - POCKET_CHAMFER_SIZE, 0), (1, POCKET_CHAMFER_SIZE), (1, 0), align=None)
    revolve(axis=Axis((45.5, -9, -26), (0, 0, -1)), revolution_arc=90, mode=Mode.SUBTRACT)

    # Sketch5 → stomp support (add)
    with BuildSketch(Plane(origin=(0, 0, 0), x_dir=(-1, 0, 0), z_dir=(0, -1, 0))):
        with Locations(Location((51.91841541, -29.239997644, 0), (0, 0, 270))):
            Circle(SKETCH5_R)
        with Locations(Location((51.91841541, 29.760001196, 0), (0, 0, 270))):
            Circle(SKETCH5_R)
    extrude(amount=STOMP_SUPPORT_DEPTH)

    # Sketch6 → screw head place (cut)
    with BuildSketch(Plane(origin=(0, -18.85, 0), x_dir=(-1, 0, 0), z_dir=(0, -1, 0))):
        with Locations(Location((51.91841541, -29.239997644, 0), (0, 0, 90))):
            Circle(SKETCH6_R)
        with Locations(Location((51.91841541, 29.760001196, 0), (0, 0, 90))):
            Circle(SKETCH6_R)
    extrude(amount=-SCREW_HEAD_PLACE_DEPTH, mode=Mode.SUBTRACT)

    # Fillet4
    fillet4_edges = [part.edges().sort_by_distance(p)[0] for p in [
        (-51.91841541, 0, 23.239997644),
        (-51.91841541, 0, -35.760001196),
    ]]
    fillet(fillet4_edges, radius=FILLET4_R)


solid = part.part
